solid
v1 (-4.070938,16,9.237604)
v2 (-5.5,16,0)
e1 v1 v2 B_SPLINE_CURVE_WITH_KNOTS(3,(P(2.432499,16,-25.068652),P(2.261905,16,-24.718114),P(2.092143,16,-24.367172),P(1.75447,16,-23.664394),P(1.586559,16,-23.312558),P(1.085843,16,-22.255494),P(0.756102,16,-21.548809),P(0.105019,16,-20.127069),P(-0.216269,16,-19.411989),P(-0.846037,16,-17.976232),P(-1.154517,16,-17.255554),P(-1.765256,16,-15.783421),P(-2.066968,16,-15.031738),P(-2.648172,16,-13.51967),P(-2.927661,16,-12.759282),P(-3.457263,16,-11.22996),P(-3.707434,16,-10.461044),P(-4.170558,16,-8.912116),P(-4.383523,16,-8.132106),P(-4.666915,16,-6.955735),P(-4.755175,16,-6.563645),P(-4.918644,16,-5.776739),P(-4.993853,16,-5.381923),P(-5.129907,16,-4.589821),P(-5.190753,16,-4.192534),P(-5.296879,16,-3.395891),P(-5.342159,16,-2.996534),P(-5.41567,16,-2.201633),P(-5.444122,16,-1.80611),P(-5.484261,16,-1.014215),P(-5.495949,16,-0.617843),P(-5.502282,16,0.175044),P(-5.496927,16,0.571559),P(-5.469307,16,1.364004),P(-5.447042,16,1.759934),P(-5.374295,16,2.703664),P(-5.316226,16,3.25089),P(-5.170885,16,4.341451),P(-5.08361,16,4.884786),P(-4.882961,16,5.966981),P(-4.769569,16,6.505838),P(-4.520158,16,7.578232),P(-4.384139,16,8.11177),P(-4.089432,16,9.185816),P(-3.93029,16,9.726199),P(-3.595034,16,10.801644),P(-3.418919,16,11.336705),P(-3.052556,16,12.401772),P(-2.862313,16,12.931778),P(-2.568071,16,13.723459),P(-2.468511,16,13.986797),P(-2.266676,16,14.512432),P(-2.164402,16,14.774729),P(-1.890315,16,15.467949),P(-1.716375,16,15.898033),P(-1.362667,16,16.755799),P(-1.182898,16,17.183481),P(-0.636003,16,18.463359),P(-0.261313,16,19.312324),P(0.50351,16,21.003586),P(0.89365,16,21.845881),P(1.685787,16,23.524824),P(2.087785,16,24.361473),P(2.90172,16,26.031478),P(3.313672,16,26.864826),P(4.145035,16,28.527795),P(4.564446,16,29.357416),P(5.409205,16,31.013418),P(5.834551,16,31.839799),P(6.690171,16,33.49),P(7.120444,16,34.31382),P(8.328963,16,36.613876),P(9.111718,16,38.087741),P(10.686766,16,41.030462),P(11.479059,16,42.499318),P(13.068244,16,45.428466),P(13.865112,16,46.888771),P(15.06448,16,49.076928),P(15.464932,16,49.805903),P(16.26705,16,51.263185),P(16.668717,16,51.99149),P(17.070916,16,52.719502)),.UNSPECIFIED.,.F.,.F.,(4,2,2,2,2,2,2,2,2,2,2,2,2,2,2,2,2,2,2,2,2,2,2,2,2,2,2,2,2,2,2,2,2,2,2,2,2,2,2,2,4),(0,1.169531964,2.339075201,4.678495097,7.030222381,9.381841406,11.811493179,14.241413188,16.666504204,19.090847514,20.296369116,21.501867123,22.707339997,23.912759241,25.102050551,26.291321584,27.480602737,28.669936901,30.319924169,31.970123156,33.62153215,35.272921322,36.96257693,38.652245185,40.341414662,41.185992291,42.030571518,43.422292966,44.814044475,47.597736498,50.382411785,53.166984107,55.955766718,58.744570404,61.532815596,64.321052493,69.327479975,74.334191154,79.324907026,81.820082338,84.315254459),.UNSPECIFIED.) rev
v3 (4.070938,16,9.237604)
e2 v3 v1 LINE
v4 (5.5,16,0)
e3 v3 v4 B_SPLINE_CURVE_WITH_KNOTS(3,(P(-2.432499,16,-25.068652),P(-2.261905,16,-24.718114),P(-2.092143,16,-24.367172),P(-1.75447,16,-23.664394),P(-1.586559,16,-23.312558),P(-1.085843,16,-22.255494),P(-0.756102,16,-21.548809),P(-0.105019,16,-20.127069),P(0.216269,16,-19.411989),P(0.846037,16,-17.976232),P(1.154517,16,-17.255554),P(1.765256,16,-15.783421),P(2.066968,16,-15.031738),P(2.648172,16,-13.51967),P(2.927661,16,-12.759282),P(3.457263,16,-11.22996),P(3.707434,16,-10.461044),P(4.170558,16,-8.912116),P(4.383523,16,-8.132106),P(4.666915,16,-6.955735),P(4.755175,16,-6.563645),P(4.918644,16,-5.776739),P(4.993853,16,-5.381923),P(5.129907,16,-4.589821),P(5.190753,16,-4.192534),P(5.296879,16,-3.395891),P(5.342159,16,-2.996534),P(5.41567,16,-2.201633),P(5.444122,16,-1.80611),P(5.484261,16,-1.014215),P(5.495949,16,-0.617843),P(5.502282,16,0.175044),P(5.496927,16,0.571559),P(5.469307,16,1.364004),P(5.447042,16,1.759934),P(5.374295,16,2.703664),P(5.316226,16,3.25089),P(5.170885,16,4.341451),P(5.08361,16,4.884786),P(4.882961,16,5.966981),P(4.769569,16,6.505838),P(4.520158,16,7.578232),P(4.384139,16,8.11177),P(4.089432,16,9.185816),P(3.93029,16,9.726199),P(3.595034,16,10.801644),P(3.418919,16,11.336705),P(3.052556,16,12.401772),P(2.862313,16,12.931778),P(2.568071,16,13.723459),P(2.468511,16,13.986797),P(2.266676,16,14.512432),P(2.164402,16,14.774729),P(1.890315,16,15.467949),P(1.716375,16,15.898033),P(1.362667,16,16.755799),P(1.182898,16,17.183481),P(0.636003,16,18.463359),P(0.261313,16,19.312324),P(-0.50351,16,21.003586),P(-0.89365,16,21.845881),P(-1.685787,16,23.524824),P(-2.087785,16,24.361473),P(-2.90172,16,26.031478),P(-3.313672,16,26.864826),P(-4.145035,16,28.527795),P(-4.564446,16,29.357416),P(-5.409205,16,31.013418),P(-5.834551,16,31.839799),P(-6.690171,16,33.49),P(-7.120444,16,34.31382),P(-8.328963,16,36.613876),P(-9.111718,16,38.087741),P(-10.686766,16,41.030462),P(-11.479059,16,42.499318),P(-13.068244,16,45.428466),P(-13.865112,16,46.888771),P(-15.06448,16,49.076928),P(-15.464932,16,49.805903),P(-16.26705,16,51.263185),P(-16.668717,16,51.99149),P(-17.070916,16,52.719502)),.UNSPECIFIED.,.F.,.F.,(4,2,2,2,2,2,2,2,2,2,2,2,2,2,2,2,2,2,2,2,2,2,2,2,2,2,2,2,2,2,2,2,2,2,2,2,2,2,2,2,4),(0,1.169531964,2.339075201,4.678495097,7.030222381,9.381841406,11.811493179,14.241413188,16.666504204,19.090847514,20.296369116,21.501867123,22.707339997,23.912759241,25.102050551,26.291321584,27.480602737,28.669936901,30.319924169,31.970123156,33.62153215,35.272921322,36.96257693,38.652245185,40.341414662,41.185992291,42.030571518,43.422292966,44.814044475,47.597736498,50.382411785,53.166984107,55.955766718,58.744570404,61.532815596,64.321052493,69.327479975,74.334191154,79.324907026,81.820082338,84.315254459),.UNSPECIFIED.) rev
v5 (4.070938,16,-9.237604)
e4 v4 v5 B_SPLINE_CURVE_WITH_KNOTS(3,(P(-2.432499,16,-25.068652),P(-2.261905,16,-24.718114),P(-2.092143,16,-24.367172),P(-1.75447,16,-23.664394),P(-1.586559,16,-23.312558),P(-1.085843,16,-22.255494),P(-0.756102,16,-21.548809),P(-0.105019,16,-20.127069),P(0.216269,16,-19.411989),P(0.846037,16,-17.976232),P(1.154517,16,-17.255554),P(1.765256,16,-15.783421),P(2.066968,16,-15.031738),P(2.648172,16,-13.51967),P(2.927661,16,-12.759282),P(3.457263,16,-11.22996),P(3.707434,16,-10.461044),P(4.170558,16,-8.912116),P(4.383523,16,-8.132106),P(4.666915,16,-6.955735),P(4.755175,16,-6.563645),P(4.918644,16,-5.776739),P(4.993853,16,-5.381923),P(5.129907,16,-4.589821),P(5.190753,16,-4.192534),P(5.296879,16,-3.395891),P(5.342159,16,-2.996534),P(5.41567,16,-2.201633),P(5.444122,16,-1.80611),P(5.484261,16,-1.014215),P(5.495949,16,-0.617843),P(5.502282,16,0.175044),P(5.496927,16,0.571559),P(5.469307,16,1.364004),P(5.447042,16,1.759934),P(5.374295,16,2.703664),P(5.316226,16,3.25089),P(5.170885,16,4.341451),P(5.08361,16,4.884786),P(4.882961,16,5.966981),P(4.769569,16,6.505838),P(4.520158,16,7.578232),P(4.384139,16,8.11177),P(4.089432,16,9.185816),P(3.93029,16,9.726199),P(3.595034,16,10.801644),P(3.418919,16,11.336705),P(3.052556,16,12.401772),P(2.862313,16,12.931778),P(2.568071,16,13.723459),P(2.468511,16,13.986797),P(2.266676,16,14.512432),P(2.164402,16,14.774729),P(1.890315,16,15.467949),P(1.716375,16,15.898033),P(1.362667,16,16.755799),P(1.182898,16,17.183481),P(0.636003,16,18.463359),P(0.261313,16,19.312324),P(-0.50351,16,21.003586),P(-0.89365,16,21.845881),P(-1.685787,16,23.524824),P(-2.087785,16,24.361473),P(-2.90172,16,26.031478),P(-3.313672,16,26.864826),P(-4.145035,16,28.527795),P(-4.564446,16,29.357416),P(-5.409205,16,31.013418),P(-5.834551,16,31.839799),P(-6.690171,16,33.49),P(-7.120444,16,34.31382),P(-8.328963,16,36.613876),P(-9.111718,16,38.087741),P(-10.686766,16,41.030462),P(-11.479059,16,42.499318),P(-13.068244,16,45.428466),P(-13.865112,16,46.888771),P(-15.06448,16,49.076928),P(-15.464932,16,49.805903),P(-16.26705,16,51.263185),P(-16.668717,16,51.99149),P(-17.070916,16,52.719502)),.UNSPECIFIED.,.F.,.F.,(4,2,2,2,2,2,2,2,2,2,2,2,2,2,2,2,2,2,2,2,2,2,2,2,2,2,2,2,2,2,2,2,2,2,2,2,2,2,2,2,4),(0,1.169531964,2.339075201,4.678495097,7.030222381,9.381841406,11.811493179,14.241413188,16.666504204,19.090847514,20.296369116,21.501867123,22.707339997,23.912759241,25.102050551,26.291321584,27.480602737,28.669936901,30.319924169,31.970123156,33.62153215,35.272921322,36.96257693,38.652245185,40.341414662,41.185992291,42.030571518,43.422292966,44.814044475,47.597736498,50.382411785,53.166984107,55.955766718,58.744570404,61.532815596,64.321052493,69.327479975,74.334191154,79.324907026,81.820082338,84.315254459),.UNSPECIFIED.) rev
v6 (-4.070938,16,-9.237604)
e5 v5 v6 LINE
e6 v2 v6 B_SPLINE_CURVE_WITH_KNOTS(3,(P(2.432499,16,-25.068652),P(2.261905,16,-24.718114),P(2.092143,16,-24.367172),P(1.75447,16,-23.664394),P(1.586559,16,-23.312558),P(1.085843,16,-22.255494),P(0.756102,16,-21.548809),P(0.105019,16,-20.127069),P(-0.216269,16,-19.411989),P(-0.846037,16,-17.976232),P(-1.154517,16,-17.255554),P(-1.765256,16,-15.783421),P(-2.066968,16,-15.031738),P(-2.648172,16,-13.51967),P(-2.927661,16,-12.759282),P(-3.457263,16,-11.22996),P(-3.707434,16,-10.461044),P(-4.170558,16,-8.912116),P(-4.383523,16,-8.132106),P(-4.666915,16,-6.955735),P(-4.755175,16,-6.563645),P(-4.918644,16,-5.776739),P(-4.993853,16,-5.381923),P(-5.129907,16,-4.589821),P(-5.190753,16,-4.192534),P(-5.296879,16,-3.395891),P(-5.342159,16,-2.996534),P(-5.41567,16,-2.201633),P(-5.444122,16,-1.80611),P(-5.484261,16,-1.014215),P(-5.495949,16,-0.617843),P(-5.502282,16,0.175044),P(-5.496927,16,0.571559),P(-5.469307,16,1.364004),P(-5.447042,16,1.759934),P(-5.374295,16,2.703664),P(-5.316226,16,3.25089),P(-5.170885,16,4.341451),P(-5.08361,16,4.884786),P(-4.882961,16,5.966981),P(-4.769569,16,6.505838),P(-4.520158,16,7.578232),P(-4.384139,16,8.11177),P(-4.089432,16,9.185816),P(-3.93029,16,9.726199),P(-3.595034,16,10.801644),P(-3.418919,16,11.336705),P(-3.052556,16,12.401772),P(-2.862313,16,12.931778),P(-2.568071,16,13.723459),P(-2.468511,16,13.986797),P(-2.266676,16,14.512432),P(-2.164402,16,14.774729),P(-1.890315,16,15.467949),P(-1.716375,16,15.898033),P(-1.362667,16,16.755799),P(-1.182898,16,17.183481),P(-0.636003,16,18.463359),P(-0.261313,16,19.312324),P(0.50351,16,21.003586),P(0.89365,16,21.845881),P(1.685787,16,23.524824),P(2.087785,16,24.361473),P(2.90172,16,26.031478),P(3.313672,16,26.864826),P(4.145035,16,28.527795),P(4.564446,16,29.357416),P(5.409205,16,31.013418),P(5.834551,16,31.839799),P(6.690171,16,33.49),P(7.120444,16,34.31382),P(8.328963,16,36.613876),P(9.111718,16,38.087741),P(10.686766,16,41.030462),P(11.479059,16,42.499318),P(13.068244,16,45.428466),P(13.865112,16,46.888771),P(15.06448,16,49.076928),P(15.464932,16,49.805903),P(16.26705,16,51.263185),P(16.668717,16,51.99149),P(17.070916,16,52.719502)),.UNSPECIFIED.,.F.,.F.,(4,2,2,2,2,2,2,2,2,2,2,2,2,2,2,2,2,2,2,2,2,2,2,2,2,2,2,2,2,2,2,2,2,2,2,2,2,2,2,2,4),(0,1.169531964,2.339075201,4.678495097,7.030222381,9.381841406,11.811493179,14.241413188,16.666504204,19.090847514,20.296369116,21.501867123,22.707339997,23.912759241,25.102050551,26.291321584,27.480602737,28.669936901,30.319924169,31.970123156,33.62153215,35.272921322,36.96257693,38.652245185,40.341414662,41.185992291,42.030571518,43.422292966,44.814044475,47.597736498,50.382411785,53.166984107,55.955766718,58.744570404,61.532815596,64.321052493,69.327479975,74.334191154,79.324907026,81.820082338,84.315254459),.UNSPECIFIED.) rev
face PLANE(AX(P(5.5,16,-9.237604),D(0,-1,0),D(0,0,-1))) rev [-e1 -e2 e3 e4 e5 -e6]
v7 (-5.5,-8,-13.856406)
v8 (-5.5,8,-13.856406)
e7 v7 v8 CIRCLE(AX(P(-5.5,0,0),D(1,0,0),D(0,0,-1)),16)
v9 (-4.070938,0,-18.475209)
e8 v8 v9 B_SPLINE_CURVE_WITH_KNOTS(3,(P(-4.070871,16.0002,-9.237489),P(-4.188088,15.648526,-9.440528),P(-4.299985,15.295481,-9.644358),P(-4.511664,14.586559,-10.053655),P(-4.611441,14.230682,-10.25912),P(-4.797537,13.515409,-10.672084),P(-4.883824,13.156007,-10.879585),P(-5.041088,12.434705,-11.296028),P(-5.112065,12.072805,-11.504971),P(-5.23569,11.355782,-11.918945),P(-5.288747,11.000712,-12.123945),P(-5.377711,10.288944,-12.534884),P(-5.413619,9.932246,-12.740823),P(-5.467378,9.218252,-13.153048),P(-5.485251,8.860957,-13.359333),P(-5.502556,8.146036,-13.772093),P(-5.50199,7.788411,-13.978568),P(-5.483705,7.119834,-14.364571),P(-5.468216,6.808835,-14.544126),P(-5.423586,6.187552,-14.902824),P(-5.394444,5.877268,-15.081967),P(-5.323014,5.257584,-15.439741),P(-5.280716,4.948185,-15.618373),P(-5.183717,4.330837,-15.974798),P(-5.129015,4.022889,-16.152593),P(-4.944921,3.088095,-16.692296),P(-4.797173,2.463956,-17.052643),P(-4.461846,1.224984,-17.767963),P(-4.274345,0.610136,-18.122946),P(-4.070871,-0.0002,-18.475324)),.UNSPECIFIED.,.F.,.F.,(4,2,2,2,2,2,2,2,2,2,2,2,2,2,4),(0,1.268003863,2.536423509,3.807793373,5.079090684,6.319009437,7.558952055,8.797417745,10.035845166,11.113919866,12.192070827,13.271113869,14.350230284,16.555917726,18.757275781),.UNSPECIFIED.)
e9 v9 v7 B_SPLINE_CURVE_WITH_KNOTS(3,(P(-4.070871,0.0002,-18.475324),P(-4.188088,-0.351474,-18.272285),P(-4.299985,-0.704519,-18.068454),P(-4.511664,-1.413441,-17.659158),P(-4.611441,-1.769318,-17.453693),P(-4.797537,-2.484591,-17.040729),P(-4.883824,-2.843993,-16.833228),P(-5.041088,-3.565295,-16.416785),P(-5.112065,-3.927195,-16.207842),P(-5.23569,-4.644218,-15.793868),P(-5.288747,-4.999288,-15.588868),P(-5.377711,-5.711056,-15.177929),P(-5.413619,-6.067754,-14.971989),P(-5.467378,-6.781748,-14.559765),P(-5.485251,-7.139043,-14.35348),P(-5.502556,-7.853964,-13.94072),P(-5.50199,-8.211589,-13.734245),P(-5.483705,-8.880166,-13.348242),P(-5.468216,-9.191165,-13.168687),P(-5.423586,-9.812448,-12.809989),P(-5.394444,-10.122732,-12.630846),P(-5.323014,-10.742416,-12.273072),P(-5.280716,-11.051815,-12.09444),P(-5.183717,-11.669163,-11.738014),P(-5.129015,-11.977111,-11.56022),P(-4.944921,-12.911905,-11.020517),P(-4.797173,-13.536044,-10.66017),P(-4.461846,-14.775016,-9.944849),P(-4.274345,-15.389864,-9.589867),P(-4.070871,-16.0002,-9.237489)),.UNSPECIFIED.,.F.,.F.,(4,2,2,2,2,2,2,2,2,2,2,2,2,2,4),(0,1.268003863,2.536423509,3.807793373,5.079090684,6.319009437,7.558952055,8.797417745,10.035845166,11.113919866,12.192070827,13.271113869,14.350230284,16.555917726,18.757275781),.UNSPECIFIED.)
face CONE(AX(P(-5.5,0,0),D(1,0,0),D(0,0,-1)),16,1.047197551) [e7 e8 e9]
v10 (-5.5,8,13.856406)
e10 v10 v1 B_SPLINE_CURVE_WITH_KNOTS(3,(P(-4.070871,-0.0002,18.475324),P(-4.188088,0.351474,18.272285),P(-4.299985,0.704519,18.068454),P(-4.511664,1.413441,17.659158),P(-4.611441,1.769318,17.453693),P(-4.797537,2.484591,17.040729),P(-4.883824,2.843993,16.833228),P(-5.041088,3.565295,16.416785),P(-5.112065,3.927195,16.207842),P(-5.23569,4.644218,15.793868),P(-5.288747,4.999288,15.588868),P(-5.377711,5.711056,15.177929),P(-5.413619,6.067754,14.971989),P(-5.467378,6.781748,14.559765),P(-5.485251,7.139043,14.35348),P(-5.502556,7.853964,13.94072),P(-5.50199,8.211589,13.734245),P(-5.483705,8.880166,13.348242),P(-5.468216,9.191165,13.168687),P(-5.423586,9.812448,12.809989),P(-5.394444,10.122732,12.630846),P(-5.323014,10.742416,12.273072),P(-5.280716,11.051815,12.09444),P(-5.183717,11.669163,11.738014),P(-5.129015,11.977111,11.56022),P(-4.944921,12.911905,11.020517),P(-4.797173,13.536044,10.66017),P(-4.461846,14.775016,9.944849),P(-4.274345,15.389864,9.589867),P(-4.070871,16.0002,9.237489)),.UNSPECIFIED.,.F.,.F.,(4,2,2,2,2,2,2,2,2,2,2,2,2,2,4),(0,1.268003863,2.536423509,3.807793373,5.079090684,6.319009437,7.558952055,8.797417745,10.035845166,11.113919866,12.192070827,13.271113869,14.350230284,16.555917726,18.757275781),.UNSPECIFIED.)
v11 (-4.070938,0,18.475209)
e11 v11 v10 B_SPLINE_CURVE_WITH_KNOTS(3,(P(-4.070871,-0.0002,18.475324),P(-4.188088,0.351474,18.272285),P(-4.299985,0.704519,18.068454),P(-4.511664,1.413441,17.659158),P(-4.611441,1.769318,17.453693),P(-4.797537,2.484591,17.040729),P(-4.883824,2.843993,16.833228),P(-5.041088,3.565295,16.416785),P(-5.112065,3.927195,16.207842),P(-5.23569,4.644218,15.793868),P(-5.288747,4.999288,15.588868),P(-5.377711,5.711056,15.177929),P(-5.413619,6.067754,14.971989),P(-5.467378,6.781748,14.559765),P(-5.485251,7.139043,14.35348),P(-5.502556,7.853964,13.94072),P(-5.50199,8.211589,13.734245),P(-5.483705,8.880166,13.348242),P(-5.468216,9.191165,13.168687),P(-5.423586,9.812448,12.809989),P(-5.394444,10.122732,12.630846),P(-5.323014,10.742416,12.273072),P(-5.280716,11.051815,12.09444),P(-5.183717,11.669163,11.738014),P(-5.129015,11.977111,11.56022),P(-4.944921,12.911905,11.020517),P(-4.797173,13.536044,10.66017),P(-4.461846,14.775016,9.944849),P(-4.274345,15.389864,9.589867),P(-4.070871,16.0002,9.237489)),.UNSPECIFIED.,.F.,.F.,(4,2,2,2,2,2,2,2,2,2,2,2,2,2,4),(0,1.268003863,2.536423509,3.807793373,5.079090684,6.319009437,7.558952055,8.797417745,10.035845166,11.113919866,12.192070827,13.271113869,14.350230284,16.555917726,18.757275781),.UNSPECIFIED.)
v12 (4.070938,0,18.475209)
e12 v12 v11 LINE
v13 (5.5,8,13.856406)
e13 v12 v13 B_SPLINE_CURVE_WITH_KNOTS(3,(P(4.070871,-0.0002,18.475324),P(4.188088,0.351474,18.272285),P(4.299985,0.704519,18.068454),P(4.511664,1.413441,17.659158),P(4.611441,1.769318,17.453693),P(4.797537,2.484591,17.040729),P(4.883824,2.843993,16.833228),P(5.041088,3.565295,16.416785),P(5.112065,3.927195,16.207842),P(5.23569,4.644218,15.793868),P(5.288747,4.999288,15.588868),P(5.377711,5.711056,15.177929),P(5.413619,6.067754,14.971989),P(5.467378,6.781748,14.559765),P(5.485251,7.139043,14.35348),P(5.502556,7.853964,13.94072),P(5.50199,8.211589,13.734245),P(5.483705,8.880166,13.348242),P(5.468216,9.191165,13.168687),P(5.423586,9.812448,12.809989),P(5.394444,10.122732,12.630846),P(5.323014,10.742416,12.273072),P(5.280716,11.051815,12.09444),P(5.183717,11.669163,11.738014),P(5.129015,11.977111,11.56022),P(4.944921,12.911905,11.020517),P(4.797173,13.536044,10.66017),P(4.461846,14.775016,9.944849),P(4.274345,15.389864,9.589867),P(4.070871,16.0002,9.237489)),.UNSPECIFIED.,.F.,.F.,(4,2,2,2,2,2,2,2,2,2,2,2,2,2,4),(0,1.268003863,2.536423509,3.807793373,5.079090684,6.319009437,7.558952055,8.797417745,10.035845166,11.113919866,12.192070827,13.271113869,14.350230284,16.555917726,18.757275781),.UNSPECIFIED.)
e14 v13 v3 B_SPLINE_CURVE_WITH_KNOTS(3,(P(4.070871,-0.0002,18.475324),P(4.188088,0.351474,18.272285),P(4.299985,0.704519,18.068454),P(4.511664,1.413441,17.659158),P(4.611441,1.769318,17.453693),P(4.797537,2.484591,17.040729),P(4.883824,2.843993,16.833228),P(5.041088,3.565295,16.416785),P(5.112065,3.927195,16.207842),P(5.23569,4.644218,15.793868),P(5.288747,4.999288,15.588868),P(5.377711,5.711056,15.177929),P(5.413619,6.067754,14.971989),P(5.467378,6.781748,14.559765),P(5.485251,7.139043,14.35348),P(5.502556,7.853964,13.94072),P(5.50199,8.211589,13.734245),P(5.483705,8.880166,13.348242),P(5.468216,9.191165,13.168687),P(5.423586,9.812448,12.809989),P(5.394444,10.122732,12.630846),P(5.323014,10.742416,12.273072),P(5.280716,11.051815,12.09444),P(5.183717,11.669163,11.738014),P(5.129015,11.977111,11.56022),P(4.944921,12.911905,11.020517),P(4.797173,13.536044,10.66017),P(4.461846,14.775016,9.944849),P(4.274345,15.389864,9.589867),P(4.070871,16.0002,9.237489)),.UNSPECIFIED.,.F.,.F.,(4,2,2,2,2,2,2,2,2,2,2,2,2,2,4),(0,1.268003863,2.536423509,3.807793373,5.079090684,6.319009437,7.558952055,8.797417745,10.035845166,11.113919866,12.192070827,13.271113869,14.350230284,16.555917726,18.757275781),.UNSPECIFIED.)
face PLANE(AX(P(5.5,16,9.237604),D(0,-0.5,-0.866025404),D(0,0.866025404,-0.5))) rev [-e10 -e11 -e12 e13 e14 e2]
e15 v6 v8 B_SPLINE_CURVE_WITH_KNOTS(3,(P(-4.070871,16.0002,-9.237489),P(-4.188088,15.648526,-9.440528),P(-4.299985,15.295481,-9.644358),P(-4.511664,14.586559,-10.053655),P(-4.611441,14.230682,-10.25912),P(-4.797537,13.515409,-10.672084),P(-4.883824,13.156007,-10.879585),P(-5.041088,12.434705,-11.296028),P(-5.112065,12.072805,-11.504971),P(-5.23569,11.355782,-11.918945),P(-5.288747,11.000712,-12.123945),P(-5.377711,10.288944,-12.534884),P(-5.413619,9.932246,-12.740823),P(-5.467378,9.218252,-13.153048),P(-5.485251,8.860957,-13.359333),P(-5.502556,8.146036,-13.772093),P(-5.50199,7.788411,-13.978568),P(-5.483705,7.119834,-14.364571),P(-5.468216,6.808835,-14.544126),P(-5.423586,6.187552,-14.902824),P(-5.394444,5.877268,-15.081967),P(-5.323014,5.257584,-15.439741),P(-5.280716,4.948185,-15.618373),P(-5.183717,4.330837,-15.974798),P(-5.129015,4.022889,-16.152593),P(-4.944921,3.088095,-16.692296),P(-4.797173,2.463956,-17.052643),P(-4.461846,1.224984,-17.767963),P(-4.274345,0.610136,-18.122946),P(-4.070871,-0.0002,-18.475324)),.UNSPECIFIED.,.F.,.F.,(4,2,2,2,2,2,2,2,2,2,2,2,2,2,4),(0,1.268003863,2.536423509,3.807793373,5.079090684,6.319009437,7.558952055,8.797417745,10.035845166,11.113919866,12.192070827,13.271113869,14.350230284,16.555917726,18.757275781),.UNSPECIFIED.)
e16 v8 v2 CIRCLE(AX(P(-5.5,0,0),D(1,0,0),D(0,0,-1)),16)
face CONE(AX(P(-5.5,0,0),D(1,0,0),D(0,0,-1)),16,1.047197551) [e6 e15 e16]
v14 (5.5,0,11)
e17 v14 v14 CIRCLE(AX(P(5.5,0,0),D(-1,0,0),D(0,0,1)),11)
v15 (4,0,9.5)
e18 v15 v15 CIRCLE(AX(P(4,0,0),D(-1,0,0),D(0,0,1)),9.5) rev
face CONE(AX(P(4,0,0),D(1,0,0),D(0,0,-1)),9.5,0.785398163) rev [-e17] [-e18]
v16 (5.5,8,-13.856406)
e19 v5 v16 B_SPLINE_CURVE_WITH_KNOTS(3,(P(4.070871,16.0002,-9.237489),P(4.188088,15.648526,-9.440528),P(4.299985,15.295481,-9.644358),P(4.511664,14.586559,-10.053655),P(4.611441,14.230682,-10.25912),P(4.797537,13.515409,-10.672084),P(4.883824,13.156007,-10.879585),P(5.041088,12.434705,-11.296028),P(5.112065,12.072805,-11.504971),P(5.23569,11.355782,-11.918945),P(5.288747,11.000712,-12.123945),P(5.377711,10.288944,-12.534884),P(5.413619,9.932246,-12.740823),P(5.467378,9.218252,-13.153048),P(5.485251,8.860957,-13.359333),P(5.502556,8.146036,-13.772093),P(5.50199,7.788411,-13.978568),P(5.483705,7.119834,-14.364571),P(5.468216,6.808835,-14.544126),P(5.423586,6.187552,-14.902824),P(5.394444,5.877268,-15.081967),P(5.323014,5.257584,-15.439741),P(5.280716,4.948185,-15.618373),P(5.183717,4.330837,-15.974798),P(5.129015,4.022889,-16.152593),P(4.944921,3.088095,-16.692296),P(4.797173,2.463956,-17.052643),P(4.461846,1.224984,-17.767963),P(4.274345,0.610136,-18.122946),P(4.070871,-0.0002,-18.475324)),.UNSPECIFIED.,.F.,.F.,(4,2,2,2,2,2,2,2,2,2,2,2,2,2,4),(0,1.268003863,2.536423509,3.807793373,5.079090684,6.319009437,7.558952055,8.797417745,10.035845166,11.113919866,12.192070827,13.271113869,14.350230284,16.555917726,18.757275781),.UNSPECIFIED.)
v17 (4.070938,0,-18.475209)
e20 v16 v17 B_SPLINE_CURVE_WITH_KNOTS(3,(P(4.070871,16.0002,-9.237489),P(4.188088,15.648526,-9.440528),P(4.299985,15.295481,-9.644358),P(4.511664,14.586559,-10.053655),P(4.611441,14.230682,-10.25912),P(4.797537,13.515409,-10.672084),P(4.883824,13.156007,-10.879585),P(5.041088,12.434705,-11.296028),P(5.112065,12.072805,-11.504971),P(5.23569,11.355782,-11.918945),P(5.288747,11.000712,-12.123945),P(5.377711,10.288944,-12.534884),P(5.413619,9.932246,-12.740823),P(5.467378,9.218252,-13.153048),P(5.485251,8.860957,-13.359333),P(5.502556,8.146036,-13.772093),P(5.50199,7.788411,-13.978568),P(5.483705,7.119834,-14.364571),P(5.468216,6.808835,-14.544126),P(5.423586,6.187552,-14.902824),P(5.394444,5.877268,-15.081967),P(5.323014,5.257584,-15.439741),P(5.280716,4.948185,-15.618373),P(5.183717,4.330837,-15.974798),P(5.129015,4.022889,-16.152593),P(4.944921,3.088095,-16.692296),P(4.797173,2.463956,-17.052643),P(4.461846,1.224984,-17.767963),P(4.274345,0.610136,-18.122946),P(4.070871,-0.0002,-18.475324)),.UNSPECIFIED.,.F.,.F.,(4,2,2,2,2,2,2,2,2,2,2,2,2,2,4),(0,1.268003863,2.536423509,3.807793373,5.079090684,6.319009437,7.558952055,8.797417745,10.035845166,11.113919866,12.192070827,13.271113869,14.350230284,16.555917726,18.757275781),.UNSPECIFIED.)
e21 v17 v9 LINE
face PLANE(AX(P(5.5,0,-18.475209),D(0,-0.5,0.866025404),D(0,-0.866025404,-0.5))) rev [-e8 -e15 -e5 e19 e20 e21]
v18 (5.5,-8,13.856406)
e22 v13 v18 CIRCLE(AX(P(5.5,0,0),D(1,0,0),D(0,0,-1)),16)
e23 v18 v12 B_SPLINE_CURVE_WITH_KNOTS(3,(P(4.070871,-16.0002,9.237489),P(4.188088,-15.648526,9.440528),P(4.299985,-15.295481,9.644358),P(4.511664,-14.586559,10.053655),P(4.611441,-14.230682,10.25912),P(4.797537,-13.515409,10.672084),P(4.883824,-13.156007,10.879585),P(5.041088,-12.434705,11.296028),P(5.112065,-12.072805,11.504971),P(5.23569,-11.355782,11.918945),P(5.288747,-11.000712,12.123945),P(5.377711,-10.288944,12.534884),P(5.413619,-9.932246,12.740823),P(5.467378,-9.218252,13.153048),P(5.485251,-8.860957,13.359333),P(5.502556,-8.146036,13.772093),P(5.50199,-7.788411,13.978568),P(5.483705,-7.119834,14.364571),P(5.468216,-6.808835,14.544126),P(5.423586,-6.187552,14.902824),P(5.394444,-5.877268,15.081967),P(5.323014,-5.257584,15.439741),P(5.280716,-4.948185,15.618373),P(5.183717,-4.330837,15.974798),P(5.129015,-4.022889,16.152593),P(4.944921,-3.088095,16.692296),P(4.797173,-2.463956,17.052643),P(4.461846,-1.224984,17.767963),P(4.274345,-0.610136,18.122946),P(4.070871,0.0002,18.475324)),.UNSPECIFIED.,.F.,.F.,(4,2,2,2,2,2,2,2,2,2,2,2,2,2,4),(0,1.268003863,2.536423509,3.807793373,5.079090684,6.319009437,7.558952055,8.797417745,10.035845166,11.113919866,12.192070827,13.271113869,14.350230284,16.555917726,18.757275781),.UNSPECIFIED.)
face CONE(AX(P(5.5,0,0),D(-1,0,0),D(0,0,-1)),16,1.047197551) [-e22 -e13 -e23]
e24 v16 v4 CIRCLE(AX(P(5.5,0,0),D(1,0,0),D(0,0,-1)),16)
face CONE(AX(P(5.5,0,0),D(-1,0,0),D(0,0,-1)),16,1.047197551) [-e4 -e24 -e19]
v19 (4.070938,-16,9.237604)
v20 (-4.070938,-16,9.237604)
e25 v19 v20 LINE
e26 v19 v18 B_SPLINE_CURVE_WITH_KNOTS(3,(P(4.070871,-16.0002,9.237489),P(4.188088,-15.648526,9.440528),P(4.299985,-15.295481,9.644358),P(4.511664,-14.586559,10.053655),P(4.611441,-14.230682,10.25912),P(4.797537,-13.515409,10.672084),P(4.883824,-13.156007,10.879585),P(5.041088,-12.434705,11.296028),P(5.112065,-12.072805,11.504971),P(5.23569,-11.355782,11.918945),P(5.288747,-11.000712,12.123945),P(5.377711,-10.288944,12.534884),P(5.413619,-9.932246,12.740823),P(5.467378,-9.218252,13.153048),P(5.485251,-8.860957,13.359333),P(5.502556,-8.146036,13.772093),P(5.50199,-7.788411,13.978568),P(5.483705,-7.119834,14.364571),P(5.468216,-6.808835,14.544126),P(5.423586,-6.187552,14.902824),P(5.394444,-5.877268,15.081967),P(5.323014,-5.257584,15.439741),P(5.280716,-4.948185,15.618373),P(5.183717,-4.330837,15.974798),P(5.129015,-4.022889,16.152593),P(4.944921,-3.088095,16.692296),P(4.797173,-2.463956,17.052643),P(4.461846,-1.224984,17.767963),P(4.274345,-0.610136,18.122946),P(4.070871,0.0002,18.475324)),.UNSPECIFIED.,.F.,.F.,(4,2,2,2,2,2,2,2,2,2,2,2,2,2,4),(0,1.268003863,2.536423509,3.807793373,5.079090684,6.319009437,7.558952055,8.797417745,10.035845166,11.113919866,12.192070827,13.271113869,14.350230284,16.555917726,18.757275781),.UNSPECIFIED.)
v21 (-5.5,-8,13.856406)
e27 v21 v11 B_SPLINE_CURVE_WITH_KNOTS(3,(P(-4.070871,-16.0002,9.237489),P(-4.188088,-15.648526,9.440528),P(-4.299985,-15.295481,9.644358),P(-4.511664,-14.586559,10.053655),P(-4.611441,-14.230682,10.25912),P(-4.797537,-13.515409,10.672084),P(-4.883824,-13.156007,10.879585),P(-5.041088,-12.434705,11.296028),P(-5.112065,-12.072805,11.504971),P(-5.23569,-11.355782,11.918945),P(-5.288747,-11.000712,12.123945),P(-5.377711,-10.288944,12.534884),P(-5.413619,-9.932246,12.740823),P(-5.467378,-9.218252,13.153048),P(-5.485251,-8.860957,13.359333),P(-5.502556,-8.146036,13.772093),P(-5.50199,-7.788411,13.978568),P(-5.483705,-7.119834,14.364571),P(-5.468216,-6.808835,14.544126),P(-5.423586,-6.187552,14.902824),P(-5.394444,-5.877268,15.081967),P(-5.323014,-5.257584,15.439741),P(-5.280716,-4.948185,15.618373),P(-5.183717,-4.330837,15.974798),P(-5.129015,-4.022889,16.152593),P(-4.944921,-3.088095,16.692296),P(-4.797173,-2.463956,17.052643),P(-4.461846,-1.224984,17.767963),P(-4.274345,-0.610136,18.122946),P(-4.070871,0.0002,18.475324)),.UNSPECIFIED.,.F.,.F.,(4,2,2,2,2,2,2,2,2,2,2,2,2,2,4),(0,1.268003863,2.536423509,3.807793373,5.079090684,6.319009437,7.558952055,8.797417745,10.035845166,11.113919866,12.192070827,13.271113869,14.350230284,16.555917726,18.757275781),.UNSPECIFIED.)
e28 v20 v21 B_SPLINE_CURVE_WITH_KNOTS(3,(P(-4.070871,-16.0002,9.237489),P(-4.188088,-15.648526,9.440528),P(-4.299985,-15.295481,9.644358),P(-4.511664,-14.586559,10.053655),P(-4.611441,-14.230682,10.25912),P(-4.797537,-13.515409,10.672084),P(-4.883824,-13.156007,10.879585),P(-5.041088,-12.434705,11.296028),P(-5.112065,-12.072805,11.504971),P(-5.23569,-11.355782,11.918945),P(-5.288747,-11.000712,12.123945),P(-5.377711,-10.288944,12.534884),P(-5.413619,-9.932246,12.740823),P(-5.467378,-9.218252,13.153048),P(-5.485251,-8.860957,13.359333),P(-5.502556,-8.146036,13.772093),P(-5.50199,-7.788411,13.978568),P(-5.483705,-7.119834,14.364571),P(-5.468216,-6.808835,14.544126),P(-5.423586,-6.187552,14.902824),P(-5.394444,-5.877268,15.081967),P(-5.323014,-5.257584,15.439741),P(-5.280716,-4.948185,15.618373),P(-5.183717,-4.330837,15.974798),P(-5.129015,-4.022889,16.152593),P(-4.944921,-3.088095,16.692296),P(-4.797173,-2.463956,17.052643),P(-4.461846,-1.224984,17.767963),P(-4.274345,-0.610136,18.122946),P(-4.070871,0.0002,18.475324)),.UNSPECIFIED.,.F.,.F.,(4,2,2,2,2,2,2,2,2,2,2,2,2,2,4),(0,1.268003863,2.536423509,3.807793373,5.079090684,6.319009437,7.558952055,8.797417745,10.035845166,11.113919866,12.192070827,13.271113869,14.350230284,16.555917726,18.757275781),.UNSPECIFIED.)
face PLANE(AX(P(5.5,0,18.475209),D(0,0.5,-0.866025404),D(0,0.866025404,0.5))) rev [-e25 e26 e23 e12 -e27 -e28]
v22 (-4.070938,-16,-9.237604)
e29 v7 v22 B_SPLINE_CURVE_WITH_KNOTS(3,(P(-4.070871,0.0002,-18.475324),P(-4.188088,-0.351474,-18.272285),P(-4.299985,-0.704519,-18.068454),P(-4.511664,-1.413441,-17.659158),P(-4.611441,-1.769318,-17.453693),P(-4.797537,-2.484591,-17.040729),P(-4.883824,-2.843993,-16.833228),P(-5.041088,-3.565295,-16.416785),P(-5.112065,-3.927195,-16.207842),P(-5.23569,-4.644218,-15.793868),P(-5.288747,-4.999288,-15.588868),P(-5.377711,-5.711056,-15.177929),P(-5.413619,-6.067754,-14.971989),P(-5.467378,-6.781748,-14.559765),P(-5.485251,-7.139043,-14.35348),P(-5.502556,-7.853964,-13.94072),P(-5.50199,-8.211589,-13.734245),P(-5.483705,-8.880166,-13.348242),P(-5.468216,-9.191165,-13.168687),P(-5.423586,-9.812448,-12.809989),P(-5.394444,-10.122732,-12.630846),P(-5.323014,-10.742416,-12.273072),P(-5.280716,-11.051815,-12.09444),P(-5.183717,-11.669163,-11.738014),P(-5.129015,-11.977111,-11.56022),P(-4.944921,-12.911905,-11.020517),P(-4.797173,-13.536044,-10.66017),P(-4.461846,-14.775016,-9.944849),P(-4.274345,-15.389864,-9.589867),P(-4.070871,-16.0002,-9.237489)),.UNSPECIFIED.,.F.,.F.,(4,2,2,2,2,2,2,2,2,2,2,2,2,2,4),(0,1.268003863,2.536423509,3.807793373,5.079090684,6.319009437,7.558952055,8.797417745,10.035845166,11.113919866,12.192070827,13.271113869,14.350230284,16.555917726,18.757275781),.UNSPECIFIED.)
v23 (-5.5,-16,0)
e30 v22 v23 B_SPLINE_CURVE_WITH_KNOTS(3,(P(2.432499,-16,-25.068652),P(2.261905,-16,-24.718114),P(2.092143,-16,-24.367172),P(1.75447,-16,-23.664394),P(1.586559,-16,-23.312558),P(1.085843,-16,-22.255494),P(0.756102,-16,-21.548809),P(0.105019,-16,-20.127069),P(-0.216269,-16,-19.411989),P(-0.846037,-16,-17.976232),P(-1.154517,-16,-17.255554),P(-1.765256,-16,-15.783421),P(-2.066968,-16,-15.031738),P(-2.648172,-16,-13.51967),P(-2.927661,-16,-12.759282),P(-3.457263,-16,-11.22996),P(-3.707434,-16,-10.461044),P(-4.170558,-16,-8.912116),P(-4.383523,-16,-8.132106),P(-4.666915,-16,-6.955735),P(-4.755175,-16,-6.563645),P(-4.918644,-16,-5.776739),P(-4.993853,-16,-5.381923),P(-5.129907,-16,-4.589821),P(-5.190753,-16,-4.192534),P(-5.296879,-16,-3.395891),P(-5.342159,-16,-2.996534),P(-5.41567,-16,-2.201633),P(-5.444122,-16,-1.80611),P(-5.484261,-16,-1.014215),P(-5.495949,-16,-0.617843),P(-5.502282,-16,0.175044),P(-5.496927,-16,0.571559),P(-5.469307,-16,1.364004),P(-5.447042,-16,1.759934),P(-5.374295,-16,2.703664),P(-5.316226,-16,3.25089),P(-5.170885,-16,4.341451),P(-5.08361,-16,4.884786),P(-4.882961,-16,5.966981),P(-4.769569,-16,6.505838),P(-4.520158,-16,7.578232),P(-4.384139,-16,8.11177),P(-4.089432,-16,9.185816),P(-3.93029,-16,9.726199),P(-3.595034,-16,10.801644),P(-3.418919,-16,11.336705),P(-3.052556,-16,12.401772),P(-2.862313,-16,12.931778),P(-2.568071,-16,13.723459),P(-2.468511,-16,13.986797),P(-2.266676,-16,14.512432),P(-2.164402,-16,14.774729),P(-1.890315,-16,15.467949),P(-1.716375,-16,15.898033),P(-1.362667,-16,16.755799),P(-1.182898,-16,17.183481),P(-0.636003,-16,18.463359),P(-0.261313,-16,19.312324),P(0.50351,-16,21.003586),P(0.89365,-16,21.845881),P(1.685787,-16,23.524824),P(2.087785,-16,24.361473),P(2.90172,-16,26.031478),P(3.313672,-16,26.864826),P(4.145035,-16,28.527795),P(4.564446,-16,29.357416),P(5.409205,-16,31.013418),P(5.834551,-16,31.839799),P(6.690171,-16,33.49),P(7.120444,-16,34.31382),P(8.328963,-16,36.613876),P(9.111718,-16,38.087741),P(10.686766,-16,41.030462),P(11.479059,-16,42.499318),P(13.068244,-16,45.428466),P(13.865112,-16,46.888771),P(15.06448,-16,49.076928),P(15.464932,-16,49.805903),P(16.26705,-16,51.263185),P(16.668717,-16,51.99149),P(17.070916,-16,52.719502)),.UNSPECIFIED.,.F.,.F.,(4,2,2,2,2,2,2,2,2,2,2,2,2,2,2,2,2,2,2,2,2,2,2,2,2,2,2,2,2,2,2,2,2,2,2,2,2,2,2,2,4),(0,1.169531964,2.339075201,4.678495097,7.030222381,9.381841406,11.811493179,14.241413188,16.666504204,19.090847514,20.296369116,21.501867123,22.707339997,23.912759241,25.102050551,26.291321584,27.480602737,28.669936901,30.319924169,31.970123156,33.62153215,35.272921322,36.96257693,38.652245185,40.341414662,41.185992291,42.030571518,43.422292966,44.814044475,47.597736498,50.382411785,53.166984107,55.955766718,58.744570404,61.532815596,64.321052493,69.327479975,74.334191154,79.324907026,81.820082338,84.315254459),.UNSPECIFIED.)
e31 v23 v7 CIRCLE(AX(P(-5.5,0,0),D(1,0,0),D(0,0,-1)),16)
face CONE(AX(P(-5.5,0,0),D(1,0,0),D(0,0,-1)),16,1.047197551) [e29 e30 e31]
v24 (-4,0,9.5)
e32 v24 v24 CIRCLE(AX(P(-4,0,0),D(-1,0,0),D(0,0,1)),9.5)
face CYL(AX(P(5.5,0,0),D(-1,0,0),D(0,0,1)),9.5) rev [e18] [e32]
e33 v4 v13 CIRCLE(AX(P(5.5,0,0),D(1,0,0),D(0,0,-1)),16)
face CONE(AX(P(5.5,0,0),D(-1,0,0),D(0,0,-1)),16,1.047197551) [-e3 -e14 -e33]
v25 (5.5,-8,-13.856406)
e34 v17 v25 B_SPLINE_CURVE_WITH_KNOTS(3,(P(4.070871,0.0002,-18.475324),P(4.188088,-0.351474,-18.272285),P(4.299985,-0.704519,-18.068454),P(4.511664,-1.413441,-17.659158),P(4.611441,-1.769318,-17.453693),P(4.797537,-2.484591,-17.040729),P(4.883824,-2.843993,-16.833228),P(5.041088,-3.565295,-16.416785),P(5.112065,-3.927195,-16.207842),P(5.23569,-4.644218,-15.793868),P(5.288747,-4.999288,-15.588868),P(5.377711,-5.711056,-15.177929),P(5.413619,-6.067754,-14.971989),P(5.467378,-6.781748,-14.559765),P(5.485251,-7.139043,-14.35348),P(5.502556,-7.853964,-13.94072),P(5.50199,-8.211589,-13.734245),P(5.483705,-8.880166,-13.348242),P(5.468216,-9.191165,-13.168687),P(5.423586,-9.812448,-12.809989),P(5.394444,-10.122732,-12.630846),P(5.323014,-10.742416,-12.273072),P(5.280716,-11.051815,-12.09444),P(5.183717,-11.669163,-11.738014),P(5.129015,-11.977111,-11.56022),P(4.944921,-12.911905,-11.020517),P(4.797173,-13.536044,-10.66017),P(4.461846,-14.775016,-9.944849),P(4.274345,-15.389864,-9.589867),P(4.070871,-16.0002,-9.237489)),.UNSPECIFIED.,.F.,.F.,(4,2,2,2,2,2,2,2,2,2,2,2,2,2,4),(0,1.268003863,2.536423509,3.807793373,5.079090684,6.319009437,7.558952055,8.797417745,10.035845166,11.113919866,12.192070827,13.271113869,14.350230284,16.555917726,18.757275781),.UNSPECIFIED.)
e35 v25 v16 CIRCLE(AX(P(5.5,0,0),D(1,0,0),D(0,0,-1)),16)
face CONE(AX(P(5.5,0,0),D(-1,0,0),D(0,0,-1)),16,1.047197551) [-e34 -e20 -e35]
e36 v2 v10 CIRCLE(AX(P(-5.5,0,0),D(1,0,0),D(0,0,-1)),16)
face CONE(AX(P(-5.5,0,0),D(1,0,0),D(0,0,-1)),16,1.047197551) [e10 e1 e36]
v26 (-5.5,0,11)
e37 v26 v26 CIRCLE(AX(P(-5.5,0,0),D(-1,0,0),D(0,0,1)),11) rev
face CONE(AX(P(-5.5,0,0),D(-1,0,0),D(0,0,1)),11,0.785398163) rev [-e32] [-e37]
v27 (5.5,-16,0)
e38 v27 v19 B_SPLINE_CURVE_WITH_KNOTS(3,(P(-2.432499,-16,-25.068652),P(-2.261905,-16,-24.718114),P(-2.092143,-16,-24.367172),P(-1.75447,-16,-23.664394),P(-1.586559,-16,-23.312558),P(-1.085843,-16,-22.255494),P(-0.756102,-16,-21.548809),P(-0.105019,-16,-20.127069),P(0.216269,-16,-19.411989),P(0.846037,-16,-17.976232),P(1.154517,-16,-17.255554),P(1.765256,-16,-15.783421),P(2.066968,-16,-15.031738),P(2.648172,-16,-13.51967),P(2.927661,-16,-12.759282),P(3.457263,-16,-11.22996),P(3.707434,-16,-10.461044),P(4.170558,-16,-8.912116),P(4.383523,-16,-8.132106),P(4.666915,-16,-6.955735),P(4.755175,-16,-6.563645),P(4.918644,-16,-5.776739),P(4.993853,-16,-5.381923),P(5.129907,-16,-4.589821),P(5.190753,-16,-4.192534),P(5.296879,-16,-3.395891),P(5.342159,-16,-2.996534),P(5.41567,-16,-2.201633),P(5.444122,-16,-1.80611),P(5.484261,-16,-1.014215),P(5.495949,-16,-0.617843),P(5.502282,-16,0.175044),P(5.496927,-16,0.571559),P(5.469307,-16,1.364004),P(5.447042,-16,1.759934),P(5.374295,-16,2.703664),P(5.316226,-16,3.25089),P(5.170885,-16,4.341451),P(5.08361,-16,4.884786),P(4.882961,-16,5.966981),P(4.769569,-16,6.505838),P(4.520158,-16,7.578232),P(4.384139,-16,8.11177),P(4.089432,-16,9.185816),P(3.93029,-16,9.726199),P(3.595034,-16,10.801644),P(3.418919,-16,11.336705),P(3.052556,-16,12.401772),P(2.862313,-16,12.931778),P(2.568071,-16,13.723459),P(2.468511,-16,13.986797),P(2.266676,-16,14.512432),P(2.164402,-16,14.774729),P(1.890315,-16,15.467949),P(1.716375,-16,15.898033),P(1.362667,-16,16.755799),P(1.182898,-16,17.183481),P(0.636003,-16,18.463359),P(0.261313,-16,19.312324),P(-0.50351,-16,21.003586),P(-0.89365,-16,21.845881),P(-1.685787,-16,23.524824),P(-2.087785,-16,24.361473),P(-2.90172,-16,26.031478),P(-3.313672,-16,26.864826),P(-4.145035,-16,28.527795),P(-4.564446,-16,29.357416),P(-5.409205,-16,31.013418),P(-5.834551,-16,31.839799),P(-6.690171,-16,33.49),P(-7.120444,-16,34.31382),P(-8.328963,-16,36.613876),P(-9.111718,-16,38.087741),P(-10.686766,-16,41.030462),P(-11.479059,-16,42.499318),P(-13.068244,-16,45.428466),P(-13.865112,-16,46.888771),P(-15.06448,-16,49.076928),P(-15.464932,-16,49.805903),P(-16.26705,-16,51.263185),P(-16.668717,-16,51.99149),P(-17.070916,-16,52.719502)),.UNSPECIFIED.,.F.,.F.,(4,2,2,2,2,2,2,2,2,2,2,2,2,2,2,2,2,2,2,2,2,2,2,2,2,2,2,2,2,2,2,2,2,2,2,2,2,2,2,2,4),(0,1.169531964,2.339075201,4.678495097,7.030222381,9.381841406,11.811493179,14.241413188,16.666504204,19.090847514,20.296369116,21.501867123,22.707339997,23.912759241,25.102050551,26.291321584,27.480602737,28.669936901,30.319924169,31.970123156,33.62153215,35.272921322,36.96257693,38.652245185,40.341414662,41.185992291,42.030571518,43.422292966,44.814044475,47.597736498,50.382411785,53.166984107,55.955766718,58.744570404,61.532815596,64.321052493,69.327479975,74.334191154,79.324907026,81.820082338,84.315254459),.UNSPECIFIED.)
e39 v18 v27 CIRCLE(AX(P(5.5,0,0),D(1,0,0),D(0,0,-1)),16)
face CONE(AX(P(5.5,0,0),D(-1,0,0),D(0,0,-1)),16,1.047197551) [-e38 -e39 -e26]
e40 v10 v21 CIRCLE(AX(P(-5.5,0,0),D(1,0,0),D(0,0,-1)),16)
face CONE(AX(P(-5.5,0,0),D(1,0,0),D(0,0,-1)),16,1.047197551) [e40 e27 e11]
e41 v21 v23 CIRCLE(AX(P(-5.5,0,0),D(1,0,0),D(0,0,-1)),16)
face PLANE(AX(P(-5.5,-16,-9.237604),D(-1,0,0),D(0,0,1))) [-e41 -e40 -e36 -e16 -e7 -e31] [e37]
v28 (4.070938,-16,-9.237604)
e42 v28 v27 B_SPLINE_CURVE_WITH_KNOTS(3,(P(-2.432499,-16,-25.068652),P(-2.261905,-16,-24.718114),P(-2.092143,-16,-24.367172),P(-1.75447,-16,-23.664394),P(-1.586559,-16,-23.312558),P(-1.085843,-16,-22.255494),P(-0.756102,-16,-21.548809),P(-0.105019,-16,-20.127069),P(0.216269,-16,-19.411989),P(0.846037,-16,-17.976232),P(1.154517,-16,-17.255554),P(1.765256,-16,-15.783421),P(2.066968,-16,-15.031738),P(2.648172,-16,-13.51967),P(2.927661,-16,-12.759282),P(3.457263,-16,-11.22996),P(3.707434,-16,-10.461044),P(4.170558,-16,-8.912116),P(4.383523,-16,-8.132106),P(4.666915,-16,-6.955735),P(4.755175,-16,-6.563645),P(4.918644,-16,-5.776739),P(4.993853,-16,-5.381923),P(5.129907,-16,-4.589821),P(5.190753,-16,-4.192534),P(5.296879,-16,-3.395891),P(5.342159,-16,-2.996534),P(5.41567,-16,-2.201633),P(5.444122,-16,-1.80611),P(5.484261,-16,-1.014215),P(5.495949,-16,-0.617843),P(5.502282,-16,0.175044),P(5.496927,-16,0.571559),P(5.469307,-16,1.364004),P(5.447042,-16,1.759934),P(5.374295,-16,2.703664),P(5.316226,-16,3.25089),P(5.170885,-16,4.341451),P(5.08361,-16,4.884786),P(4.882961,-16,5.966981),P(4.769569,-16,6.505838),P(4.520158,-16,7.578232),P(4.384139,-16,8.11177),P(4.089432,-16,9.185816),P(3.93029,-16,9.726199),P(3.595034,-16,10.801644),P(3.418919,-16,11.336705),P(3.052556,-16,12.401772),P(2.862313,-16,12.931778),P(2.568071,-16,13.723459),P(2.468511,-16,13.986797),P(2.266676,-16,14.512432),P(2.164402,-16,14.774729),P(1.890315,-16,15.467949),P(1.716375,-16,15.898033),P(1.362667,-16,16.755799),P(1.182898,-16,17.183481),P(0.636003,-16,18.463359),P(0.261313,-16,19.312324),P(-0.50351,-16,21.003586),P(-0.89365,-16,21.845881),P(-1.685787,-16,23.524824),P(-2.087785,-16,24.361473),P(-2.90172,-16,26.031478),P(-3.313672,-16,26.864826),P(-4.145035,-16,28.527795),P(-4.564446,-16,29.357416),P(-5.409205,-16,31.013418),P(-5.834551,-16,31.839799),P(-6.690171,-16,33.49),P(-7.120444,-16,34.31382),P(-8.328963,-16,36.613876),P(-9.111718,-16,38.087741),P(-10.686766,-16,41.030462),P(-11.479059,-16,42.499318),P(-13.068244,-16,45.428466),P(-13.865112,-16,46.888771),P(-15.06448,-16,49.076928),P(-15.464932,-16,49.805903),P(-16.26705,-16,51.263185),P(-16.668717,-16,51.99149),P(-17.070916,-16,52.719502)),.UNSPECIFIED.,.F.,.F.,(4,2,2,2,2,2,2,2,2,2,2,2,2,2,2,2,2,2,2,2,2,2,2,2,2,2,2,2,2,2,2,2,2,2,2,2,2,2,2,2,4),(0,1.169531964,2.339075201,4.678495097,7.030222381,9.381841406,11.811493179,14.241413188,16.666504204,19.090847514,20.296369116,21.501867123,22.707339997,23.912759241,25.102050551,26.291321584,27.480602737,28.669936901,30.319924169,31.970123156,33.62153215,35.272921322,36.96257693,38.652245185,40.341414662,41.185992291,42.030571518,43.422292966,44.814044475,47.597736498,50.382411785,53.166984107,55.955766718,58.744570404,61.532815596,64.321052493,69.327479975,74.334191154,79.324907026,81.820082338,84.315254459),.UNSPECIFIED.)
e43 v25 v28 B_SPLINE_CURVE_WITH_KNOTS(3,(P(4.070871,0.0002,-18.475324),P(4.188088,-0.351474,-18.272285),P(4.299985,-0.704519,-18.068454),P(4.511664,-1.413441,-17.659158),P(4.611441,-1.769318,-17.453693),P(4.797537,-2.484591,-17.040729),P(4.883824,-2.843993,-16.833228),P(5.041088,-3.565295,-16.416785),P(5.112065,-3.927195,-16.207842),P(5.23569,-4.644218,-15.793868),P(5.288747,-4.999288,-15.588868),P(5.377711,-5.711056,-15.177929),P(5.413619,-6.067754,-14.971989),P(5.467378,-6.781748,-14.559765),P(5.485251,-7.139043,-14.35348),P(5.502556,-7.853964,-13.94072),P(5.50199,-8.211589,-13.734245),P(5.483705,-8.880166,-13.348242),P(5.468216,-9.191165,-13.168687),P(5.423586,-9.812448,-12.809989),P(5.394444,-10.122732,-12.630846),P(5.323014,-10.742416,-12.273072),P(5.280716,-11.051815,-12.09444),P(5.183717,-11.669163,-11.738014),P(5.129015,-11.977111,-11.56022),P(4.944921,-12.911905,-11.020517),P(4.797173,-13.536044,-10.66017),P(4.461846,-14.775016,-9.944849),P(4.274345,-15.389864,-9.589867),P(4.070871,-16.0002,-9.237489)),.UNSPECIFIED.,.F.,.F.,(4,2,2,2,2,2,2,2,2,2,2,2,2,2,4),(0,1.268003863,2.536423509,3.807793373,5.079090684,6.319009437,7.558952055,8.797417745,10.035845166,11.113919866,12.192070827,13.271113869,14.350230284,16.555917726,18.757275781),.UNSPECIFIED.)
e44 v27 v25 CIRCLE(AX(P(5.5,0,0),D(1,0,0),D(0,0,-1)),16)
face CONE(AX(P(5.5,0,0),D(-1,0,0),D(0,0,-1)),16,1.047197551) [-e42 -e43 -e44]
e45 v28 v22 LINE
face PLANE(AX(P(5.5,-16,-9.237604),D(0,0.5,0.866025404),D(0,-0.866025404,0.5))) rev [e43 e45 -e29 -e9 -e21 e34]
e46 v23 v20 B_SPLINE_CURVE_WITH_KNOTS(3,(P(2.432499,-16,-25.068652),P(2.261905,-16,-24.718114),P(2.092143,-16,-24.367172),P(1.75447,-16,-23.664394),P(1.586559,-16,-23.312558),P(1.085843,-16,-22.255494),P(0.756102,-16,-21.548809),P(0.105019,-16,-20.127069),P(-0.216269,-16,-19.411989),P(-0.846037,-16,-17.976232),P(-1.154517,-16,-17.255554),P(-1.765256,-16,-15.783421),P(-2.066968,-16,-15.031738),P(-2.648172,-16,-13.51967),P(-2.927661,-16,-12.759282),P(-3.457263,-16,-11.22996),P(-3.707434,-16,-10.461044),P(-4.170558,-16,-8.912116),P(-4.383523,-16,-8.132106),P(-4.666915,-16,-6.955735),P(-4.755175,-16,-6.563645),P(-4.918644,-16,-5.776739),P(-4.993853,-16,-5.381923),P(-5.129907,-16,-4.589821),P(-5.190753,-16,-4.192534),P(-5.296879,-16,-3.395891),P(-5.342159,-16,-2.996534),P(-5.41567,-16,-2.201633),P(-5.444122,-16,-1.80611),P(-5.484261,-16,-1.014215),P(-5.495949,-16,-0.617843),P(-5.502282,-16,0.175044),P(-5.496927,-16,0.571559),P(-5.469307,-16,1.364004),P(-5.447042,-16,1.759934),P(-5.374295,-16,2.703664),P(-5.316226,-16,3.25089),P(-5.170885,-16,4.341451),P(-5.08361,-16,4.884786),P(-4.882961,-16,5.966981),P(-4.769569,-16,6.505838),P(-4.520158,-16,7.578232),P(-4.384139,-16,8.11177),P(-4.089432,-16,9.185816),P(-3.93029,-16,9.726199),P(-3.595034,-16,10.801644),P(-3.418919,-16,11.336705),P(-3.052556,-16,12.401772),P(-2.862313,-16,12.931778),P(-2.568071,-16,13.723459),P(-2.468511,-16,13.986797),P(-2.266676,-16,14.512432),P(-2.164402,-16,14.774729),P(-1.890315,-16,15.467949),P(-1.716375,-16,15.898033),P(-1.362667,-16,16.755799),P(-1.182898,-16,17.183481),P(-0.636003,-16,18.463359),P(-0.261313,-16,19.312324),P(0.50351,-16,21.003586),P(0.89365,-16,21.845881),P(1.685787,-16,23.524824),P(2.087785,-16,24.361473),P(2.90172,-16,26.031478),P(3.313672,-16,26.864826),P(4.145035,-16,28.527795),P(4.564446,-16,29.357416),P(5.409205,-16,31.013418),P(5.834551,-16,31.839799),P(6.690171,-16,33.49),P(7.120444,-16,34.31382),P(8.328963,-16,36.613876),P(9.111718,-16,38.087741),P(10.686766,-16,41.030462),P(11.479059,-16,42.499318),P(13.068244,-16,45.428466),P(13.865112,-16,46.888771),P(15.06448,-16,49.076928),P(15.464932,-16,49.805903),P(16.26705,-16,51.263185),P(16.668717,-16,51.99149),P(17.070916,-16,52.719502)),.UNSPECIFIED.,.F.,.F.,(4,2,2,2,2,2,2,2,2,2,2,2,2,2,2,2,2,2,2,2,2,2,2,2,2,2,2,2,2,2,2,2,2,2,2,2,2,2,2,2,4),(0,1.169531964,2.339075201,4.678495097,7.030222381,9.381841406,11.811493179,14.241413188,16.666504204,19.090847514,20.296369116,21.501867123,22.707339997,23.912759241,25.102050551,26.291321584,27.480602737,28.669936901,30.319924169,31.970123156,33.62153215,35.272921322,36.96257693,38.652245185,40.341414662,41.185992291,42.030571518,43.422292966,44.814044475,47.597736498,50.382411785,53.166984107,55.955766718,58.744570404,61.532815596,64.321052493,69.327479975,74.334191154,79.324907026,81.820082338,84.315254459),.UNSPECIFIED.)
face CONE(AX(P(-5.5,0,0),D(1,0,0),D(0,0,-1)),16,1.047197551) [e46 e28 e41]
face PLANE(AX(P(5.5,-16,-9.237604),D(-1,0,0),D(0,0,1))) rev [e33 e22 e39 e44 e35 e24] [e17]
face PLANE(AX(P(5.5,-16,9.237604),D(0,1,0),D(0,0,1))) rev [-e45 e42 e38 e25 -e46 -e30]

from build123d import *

# Parameters (mm, degrees)
SKETCH1_R      = 9.5
EXTRUDE1_DEPTH = 5.5
SMUSSO1_SIZE   = 1.5


# Read off the part's stored shape, not the designer's step: Cut-Extrude1
with BuildPart() as part:
    # Sketch1 → Extrude1 (new, symmetric)
    with BuildSketch(Plane(origin=(0, 0, 0), x_dir=(0, 0, -1), z_dir=(1, 0, 0))):
        Polygon((18.475208614, 0), (9.237604307, 16), (-9.237604307, 16), (-18.475208614, 0), (-9.237604307, -16), (9.237604307, -16), align=None)
        Circle(SKETCH1_R, mode=Mode.SUBTRACT)
    extrude(amount=EXTRUDE1_DEPTH, both=True)

    # Cut-Extrude1 outline → Cut-Extrude1 (revolve, cut)
    with BuildSketch(Plane.YX):
        Polygon((18.475208616, 5.500000004), (15.999999996, 5.500000004), (18.475208616, 4.070937639), align=None)
    cut_extrude1 = revolve(axis=Axis((0, 0, 0), (1, 0, 0)), mode=Mode.SUBTRACT)

    # Mirror1: Cut-Extrude1 across plane
    add(cut_extrude1.mirror(Plane(origin=(0, 0, 0), x_dir=(0, 0, 1), z_dir=(1, 0, 0))), mode=Mode.SUBTRACT)

    # Smusso1
    smusso1_edges = [part.edges().sort_by_distance(p)[0] for p in [
        (-5.5, 0, 9.5),
        (5.5, 0, 9.5),
    ]]
    chamfer(smusso1_edges, length=SMUSSO1_SIZE)


solid = part.part
